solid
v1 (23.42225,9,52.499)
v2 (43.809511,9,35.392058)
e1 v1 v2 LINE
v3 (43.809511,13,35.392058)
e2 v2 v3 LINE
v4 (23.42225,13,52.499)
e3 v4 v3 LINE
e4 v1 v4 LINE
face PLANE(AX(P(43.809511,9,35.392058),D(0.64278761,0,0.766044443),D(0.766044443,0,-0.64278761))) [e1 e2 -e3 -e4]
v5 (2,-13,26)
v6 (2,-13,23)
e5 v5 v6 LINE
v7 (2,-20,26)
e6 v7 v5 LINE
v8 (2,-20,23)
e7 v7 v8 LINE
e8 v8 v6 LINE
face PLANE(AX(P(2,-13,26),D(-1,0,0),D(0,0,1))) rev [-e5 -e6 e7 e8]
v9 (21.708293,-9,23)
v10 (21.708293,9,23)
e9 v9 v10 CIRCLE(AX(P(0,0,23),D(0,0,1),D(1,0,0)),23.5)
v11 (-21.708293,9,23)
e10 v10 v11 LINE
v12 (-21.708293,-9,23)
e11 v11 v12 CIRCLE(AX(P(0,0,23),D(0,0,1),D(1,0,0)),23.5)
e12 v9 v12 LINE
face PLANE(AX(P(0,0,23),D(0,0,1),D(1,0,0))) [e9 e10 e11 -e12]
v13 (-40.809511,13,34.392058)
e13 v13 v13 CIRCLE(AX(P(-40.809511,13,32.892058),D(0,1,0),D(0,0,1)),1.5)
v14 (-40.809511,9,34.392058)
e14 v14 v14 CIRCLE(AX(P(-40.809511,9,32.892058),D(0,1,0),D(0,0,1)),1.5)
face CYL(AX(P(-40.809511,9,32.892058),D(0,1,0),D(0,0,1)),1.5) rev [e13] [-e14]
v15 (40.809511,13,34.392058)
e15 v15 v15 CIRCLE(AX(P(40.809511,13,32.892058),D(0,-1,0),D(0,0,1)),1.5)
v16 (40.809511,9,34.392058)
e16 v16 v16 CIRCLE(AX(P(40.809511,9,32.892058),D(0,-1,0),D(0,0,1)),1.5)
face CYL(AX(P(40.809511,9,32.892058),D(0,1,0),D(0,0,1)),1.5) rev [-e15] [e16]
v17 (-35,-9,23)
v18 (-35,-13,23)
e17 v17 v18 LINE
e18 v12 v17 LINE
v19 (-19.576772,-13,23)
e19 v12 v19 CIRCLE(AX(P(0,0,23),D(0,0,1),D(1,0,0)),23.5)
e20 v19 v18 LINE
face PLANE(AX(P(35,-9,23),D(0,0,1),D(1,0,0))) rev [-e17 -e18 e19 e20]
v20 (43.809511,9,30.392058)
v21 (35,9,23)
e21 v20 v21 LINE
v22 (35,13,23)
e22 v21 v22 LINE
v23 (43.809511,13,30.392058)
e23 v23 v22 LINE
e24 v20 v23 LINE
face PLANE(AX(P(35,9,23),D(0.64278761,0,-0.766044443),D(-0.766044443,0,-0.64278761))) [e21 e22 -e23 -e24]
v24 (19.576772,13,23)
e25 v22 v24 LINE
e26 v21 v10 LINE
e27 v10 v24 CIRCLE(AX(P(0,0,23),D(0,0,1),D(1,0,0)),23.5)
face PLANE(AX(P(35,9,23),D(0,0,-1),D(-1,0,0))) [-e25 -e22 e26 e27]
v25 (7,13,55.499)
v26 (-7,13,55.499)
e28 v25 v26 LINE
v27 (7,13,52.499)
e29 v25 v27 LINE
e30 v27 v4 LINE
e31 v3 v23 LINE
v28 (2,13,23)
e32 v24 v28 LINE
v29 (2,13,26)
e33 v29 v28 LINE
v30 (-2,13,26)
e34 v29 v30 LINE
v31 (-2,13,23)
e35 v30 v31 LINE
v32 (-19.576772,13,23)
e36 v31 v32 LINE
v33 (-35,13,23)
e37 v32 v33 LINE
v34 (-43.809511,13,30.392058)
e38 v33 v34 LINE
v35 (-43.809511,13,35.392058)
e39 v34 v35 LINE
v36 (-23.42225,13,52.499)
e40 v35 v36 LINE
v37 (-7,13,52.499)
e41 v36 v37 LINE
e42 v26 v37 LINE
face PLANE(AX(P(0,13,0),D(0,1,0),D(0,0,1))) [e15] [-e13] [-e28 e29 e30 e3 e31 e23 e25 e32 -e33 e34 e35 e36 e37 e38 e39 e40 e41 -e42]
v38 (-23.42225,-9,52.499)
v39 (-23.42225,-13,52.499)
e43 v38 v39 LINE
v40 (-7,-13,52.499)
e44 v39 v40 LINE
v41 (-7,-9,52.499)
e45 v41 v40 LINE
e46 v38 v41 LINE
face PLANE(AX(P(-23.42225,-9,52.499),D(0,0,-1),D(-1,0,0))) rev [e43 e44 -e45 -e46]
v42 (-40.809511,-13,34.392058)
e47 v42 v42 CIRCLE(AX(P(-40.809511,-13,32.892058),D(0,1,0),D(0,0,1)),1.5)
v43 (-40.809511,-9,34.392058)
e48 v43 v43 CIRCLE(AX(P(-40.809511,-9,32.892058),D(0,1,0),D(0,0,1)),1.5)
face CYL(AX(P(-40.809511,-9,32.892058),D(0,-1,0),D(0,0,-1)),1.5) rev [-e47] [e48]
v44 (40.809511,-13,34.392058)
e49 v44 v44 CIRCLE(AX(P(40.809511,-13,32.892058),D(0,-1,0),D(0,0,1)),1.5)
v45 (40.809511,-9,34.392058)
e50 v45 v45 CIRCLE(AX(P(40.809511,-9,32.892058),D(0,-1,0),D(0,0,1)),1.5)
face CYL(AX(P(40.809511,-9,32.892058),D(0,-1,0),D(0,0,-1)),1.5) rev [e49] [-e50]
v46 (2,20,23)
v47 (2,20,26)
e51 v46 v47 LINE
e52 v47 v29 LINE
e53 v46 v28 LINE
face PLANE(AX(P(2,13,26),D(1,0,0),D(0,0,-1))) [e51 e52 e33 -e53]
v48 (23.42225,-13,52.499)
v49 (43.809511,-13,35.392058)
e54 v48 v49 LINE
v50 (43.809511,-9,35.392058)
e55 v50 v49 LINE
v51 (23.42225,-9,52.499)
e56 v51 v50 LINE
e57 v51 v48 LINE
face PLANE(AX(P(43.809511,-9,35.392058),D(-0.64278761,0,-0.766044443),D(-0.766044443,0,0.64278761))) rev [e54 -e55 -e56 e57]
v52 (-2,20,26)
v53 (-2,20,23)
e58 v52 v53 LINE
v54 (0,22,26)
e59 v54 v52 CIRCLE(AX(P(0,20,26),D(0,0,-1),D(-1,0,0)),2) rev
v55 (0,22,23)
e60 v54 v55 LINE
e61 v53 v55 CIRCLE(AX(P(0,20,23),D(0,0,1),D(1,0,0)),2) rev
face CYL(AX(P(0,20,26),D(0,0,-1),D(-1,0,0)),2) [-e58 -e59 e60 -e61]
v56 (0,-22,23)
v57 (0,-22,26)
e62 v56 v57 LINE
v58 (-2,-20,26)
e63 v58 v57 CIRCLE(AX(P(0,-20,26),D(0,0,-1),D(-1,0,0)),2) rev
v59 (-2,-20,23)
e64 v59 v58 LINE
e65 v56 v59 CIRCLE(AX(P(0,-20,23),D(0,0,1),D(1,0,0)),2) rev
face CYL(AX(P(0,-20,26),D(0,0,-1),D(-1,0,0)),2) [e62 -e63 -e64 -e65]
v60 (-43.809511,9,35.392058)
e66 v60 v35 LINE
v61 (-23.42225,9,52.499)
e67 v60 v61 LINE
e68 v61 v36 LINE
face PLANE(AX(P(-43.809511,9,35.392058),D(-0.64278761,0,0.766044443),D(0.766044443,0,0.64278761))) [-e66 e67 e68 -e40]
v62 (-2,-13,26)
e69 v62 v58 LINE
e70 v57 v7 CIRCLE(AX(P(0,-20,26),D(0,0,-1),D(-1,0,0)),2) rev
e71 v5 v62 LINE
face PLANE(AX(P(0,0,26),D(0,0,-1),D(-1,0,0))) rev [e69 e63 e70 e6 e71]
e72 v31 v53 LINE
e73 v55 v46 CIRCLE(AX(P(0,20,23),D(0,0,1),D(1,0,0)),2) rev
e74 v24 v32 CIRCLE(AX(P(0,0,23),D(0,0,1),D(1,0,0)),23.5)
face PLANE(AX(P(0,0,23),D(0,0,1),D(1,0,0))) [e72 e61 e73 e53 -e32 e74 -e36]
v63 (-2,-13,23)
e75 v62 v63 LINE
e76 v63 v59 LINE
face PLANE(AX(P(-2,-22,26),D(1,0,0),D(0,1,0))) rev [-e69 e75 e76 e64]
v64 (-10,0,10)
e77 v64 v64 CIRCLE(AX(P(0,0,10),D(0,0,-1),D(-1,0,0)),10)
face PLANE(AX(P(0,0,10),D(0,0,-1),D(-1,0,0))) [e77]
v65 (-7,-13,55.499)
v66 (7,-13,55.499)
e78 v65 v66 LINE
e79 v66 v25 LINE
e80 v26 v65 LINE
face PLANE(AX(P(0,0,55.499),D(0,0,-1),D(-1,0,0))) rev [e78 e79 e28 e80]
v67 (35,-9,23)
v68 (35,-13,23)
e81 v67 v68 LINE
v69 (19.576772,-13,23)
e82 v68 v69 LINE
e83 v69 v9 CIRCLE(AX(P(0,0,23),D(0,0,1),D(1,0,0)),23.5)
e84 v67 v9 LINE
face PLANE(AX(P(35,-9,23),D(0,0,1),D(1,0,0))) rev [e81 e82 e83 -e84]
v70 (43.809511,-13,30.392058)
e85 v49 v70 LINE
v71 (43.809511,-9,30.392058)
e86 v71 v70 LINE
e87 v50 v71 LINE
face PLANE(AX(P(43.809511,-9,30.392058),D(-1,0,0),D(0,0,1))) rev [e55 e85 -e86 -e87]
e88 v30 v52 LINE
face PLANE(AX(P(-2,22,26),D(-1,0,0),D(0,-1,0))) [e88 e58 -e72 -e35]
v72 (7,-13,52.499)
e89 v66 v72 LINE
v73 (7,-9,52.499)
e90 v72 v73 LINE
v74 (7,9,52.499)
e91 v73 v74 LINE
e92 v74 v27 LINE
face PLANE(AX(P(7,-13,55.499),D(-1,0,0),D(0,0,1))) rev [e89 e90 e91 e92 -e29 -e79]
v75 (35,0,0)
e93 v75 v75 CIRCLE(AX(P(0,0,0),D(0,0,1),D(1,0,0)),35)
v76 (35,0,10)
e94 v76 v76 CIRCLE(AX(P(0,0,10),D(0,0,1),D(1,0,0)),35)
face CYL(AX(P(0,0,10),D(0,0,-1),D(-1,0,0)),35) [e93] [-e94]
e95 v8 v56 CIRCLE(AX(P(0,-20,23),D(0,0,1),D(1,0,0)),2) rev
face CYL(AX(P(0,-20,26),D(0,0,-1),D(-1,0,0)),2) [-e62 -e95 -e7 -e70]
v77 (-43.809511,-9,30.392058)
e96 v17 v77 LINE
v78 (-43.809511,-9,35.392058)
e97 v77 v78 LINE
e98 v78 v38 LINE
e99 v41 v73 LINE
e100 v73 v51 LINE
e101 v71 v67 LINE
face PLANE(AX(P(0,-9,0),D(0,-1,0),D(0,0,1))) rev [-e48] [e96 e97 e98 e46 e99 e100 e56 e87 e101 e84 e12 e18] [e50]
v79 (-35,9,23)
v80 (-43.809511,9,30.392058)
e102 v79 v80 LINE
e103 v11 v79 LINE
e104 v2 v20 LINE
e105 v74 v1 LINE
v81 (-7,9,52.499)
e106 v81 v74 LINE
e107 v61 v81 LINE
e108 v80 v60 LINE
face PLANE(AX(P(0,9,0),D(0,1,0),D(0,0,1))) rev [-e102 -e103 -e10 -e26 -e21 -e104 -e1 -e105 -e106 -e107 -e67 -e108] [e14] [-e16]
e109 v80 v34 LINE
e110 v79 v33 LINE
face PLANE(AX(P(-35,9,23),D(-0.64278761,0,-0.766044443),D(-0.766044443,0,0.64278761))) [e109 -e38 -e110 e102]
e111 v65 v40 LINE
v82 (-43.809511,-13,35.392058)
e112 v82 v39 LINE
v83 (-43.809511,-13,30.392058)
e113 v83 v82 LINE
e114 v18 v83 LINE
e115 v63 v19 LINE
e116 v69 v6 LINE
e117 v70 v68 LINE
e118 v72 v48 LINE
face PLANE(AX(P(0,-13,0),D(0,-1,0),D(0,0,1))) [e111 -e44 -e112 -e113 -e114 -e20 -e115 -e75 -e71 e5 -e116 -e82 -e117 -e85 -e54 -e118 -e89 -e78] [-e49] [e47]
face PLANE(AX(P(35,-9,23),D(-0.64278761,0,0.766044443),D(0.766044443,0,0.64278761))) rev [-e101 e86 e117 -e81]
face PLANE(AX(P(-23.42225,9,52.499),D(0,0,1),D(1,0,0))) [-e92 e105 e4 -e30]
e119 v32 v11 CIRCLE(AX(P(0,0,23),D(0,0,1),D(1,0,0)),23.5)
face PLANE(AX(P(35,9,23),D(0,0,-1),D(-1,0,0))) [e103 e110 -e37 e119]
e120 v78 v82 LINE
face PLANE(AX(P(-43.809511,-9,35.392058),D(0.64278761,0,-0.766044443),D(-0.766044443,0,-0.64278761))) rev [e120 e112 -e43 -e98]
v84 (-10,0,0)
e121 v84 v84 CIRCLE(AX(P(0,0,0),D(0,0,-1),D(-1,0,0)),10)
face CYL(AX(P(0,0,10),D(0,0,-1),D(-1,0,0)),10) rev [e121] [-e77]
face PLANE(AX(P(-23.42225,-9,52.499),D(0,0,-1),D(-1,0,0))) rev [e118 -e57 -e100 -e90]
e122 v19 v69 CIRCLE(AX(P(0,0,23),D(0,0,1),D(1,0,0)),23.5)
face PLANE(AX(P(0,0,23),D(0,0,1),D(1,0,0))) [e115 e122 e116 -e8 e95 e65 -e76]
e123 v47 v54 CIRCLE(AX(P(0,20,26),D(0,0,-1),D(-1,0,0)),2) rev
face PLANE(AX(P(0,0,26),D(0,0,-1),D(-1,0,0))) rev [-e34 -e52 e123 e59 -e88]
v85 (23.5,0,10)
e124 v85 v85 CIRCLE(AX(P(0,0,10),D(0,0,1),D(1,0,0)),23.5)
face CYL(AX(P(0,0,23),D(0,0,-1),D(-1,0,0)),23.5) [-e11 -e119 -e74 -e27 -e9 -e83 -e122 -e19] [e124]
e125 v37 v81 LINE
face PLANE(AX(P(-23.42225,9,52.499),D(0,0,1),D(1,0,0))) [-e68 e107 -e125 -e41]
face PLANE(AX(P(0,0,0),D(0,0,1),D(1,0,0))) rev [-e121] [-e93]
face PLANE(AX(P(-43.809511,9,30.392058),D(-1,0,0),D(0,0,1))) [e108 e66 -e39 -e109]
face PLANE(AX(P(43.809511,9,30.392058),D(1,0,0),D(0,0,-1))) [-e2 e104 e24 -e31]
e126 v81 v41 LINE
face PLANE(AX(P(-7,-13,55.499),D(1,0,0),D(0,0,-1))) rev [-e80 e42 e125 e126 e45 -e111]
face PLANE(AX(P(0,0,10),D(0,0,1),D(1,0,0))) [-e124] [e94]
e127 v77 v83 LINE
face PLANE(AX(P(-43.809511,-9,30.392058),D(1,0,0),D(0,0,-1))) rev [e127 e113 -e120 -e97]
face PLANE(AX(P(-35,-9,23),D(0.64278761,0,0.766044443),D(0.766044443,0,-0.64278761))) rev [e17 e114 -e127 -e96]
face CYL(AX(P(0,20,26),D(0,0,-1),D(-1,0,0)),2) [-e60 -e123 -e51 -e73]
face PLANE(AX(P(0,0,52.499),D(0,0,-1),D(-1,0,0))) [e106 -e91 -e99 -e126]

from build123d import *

# Parameters (mm, degrees)
SKETCH1_R               = 35
BOSS_EXTRUDE1_DEPTH     = 10
SKETCH2_R               = 23.5
BOSS_EXTRUDE2_DEPTH     = 13
BOSS_EXTRUDE3_DEPTH     = 4
SKETCH4_R               = 1.5
CUT_EXTRUDE1_DEPTH      = 4
MIRROR2_COPY_1_SKETCH_R = 1.5
MIRROR2_COPY_1_DEPTH    = 4
BOSS_EXTRUDE4_DEPTH     = 3
FILLET1_R               = 2
FILLET1_OF_MIRROR3_R    = 2
SKETCH6_W               = 14
SKETCH6_H               = 26
BOSS_EXTRUDE5_DEPTH     = 3
SKETCH7_R               = 10
CUT_EXTRUDE3_DEPTH      = 10


with BuildPart() as part:
    # Sketch1 → Boss-Extrude1 (new body)
    with BuildSketch(Plane.XY):
        Circle(SKETCH1_R)
    extrude(amount=BOSS_EXTRUDE1_DEPTH)

    # Sketch2 → Boss-Extrude2 (add)
    with BuildSketch(Plane.XY.offset(10)):
        with Locations(Location((0, 0, 0), (0, 0, 180))):
            Circle(SKETCH2_R)
    extrude(amount=BOSS_EXTRUDE2_DEPTH)

    # Sketch3 → Boss-Extrude3 (add)
    with BuildSketch(Plane(origin=(0, 13, 0), x_dir=(1, 0, 0), z_dir=(0, 1, 0))):
        Polygon((35, -23), (-35, -23), (-43.809511096, -30.392057511), (-43.809511096, -35.392057511), (-23.422250333, -52.499000499), (23.422250333, -52.499000499), (43.809511096, -35.392057511), (43.809511096, -30.392057511), align=None)
    boss_extrude3 = extrude(amount=-BOSS_EXTRUDE3_DEPTH)

    # Sketch4 → Cut-Extrude1 (cut)
    with BuildSketch(Plane(origin=(0, 13, 0), x_dir=(1, 0, 0), z_dir=(0, 1, 0))):
        with Locations(Location((-40.809511096, -32.892057511, 0), (0, 0, 270))):
            Circle(SKETCH4_R)
    cut_extrude1 = extrude(amount=-CUT_EXTRUDE1_DEPTH, mode=Mode.SUBTRACT)

    # Mirror1: Cut-Extrude1 across plane
    add(cut_extrude1.mirror(Plane(origin=(0, 0, 0), x_dir=(0, 0, 1), z_dir=(1, 0, 0))), mode=Mode.SUBTRACT)

    # Mirror2: Boss-Extrude3, Cut-Extrude1 across plane
    add(boss_extrude3.mirror(Plane.ZX))
    add(cut_extrude1.mirror(Plane.ZX), mode=Mode.SUBTRACT)

    # Mirror2 copy 1 sketch → Mirror2 copy 1 (cut)
    with BuildSketch(Plane(origin=(0, -13, 0), x_dir=(-1, 0, 0), z_dir=(0, -1, 0))):
        with Locations(Location((-40.809511096, -32.892057511, 0), (0, 0, 270))):
            Circle(MIRROR2_COPY_1_SKETCH_R)
    extrude(amount=-MIRROR2_COPY_1_DEPTH, mode=Mode.SUBTRACT)

    # Sketch5 → Boss-Extrude4 (add)
    with BuildSketch(Plane.XY.offset(23)):
        Polygon((0, -13), (2, -13), (2, -22), (0, -22), (-2, -22), (-2, -13), align=None)
    boss_extrude4 = extrude(amount=BOSS_EXTRUDE4_DEPTH)

    # Fillet1
    fillet1_edges = [part.edges().sort_by_distance(p)[0] for p in [
        (-2, -22, 24.5),
        (2, -22, 24.5),
    ]]
    fillet(fillet1_edges, radius=FILLET1_R - 0.0001)  # a hair under: the kernel refuses the full size

    # Mirror3: Boss-Extrude4 across plane
    add(boss_extrude4.mirror(Plane.ZX))

    # Fillet1 of Mirror3
    fillet1_of_mirror3_edges = [part.edges().sort_by_distance(p)[0] for p in [
        (-2, 22, 24.5),
        (2, 22, 24.5),
    ]]
    fillet(fillet1_of_mirror3_edges, radius=FILLET1_OF_MIRROR3_R - 0.0001)  # a hair under: the kernel refuses the full size

    # Sketch6 → Boss-Extrude5 (add)
    with BuildSketch(Plane.XY.offset(52.499000499)):
        Rectangle(SKETCH6_W, SKETCH6_H)
    extrude(amount=BOSS_EXTRUDE5_DEPTH)

    # Sketch7 → Cut-Extrude3 (cut)
    with BuildSketch(Plane(origin=(0, 0, 0), x_dir=(-1, 0, 0), z_dir=(0, 0, -1))):
        Circle(SKETCH7_R)
    extrude(amount=-CUT_EXTRUDE3_DEPTH, mode=Mode.SUBTRACT)


solid = part.part
